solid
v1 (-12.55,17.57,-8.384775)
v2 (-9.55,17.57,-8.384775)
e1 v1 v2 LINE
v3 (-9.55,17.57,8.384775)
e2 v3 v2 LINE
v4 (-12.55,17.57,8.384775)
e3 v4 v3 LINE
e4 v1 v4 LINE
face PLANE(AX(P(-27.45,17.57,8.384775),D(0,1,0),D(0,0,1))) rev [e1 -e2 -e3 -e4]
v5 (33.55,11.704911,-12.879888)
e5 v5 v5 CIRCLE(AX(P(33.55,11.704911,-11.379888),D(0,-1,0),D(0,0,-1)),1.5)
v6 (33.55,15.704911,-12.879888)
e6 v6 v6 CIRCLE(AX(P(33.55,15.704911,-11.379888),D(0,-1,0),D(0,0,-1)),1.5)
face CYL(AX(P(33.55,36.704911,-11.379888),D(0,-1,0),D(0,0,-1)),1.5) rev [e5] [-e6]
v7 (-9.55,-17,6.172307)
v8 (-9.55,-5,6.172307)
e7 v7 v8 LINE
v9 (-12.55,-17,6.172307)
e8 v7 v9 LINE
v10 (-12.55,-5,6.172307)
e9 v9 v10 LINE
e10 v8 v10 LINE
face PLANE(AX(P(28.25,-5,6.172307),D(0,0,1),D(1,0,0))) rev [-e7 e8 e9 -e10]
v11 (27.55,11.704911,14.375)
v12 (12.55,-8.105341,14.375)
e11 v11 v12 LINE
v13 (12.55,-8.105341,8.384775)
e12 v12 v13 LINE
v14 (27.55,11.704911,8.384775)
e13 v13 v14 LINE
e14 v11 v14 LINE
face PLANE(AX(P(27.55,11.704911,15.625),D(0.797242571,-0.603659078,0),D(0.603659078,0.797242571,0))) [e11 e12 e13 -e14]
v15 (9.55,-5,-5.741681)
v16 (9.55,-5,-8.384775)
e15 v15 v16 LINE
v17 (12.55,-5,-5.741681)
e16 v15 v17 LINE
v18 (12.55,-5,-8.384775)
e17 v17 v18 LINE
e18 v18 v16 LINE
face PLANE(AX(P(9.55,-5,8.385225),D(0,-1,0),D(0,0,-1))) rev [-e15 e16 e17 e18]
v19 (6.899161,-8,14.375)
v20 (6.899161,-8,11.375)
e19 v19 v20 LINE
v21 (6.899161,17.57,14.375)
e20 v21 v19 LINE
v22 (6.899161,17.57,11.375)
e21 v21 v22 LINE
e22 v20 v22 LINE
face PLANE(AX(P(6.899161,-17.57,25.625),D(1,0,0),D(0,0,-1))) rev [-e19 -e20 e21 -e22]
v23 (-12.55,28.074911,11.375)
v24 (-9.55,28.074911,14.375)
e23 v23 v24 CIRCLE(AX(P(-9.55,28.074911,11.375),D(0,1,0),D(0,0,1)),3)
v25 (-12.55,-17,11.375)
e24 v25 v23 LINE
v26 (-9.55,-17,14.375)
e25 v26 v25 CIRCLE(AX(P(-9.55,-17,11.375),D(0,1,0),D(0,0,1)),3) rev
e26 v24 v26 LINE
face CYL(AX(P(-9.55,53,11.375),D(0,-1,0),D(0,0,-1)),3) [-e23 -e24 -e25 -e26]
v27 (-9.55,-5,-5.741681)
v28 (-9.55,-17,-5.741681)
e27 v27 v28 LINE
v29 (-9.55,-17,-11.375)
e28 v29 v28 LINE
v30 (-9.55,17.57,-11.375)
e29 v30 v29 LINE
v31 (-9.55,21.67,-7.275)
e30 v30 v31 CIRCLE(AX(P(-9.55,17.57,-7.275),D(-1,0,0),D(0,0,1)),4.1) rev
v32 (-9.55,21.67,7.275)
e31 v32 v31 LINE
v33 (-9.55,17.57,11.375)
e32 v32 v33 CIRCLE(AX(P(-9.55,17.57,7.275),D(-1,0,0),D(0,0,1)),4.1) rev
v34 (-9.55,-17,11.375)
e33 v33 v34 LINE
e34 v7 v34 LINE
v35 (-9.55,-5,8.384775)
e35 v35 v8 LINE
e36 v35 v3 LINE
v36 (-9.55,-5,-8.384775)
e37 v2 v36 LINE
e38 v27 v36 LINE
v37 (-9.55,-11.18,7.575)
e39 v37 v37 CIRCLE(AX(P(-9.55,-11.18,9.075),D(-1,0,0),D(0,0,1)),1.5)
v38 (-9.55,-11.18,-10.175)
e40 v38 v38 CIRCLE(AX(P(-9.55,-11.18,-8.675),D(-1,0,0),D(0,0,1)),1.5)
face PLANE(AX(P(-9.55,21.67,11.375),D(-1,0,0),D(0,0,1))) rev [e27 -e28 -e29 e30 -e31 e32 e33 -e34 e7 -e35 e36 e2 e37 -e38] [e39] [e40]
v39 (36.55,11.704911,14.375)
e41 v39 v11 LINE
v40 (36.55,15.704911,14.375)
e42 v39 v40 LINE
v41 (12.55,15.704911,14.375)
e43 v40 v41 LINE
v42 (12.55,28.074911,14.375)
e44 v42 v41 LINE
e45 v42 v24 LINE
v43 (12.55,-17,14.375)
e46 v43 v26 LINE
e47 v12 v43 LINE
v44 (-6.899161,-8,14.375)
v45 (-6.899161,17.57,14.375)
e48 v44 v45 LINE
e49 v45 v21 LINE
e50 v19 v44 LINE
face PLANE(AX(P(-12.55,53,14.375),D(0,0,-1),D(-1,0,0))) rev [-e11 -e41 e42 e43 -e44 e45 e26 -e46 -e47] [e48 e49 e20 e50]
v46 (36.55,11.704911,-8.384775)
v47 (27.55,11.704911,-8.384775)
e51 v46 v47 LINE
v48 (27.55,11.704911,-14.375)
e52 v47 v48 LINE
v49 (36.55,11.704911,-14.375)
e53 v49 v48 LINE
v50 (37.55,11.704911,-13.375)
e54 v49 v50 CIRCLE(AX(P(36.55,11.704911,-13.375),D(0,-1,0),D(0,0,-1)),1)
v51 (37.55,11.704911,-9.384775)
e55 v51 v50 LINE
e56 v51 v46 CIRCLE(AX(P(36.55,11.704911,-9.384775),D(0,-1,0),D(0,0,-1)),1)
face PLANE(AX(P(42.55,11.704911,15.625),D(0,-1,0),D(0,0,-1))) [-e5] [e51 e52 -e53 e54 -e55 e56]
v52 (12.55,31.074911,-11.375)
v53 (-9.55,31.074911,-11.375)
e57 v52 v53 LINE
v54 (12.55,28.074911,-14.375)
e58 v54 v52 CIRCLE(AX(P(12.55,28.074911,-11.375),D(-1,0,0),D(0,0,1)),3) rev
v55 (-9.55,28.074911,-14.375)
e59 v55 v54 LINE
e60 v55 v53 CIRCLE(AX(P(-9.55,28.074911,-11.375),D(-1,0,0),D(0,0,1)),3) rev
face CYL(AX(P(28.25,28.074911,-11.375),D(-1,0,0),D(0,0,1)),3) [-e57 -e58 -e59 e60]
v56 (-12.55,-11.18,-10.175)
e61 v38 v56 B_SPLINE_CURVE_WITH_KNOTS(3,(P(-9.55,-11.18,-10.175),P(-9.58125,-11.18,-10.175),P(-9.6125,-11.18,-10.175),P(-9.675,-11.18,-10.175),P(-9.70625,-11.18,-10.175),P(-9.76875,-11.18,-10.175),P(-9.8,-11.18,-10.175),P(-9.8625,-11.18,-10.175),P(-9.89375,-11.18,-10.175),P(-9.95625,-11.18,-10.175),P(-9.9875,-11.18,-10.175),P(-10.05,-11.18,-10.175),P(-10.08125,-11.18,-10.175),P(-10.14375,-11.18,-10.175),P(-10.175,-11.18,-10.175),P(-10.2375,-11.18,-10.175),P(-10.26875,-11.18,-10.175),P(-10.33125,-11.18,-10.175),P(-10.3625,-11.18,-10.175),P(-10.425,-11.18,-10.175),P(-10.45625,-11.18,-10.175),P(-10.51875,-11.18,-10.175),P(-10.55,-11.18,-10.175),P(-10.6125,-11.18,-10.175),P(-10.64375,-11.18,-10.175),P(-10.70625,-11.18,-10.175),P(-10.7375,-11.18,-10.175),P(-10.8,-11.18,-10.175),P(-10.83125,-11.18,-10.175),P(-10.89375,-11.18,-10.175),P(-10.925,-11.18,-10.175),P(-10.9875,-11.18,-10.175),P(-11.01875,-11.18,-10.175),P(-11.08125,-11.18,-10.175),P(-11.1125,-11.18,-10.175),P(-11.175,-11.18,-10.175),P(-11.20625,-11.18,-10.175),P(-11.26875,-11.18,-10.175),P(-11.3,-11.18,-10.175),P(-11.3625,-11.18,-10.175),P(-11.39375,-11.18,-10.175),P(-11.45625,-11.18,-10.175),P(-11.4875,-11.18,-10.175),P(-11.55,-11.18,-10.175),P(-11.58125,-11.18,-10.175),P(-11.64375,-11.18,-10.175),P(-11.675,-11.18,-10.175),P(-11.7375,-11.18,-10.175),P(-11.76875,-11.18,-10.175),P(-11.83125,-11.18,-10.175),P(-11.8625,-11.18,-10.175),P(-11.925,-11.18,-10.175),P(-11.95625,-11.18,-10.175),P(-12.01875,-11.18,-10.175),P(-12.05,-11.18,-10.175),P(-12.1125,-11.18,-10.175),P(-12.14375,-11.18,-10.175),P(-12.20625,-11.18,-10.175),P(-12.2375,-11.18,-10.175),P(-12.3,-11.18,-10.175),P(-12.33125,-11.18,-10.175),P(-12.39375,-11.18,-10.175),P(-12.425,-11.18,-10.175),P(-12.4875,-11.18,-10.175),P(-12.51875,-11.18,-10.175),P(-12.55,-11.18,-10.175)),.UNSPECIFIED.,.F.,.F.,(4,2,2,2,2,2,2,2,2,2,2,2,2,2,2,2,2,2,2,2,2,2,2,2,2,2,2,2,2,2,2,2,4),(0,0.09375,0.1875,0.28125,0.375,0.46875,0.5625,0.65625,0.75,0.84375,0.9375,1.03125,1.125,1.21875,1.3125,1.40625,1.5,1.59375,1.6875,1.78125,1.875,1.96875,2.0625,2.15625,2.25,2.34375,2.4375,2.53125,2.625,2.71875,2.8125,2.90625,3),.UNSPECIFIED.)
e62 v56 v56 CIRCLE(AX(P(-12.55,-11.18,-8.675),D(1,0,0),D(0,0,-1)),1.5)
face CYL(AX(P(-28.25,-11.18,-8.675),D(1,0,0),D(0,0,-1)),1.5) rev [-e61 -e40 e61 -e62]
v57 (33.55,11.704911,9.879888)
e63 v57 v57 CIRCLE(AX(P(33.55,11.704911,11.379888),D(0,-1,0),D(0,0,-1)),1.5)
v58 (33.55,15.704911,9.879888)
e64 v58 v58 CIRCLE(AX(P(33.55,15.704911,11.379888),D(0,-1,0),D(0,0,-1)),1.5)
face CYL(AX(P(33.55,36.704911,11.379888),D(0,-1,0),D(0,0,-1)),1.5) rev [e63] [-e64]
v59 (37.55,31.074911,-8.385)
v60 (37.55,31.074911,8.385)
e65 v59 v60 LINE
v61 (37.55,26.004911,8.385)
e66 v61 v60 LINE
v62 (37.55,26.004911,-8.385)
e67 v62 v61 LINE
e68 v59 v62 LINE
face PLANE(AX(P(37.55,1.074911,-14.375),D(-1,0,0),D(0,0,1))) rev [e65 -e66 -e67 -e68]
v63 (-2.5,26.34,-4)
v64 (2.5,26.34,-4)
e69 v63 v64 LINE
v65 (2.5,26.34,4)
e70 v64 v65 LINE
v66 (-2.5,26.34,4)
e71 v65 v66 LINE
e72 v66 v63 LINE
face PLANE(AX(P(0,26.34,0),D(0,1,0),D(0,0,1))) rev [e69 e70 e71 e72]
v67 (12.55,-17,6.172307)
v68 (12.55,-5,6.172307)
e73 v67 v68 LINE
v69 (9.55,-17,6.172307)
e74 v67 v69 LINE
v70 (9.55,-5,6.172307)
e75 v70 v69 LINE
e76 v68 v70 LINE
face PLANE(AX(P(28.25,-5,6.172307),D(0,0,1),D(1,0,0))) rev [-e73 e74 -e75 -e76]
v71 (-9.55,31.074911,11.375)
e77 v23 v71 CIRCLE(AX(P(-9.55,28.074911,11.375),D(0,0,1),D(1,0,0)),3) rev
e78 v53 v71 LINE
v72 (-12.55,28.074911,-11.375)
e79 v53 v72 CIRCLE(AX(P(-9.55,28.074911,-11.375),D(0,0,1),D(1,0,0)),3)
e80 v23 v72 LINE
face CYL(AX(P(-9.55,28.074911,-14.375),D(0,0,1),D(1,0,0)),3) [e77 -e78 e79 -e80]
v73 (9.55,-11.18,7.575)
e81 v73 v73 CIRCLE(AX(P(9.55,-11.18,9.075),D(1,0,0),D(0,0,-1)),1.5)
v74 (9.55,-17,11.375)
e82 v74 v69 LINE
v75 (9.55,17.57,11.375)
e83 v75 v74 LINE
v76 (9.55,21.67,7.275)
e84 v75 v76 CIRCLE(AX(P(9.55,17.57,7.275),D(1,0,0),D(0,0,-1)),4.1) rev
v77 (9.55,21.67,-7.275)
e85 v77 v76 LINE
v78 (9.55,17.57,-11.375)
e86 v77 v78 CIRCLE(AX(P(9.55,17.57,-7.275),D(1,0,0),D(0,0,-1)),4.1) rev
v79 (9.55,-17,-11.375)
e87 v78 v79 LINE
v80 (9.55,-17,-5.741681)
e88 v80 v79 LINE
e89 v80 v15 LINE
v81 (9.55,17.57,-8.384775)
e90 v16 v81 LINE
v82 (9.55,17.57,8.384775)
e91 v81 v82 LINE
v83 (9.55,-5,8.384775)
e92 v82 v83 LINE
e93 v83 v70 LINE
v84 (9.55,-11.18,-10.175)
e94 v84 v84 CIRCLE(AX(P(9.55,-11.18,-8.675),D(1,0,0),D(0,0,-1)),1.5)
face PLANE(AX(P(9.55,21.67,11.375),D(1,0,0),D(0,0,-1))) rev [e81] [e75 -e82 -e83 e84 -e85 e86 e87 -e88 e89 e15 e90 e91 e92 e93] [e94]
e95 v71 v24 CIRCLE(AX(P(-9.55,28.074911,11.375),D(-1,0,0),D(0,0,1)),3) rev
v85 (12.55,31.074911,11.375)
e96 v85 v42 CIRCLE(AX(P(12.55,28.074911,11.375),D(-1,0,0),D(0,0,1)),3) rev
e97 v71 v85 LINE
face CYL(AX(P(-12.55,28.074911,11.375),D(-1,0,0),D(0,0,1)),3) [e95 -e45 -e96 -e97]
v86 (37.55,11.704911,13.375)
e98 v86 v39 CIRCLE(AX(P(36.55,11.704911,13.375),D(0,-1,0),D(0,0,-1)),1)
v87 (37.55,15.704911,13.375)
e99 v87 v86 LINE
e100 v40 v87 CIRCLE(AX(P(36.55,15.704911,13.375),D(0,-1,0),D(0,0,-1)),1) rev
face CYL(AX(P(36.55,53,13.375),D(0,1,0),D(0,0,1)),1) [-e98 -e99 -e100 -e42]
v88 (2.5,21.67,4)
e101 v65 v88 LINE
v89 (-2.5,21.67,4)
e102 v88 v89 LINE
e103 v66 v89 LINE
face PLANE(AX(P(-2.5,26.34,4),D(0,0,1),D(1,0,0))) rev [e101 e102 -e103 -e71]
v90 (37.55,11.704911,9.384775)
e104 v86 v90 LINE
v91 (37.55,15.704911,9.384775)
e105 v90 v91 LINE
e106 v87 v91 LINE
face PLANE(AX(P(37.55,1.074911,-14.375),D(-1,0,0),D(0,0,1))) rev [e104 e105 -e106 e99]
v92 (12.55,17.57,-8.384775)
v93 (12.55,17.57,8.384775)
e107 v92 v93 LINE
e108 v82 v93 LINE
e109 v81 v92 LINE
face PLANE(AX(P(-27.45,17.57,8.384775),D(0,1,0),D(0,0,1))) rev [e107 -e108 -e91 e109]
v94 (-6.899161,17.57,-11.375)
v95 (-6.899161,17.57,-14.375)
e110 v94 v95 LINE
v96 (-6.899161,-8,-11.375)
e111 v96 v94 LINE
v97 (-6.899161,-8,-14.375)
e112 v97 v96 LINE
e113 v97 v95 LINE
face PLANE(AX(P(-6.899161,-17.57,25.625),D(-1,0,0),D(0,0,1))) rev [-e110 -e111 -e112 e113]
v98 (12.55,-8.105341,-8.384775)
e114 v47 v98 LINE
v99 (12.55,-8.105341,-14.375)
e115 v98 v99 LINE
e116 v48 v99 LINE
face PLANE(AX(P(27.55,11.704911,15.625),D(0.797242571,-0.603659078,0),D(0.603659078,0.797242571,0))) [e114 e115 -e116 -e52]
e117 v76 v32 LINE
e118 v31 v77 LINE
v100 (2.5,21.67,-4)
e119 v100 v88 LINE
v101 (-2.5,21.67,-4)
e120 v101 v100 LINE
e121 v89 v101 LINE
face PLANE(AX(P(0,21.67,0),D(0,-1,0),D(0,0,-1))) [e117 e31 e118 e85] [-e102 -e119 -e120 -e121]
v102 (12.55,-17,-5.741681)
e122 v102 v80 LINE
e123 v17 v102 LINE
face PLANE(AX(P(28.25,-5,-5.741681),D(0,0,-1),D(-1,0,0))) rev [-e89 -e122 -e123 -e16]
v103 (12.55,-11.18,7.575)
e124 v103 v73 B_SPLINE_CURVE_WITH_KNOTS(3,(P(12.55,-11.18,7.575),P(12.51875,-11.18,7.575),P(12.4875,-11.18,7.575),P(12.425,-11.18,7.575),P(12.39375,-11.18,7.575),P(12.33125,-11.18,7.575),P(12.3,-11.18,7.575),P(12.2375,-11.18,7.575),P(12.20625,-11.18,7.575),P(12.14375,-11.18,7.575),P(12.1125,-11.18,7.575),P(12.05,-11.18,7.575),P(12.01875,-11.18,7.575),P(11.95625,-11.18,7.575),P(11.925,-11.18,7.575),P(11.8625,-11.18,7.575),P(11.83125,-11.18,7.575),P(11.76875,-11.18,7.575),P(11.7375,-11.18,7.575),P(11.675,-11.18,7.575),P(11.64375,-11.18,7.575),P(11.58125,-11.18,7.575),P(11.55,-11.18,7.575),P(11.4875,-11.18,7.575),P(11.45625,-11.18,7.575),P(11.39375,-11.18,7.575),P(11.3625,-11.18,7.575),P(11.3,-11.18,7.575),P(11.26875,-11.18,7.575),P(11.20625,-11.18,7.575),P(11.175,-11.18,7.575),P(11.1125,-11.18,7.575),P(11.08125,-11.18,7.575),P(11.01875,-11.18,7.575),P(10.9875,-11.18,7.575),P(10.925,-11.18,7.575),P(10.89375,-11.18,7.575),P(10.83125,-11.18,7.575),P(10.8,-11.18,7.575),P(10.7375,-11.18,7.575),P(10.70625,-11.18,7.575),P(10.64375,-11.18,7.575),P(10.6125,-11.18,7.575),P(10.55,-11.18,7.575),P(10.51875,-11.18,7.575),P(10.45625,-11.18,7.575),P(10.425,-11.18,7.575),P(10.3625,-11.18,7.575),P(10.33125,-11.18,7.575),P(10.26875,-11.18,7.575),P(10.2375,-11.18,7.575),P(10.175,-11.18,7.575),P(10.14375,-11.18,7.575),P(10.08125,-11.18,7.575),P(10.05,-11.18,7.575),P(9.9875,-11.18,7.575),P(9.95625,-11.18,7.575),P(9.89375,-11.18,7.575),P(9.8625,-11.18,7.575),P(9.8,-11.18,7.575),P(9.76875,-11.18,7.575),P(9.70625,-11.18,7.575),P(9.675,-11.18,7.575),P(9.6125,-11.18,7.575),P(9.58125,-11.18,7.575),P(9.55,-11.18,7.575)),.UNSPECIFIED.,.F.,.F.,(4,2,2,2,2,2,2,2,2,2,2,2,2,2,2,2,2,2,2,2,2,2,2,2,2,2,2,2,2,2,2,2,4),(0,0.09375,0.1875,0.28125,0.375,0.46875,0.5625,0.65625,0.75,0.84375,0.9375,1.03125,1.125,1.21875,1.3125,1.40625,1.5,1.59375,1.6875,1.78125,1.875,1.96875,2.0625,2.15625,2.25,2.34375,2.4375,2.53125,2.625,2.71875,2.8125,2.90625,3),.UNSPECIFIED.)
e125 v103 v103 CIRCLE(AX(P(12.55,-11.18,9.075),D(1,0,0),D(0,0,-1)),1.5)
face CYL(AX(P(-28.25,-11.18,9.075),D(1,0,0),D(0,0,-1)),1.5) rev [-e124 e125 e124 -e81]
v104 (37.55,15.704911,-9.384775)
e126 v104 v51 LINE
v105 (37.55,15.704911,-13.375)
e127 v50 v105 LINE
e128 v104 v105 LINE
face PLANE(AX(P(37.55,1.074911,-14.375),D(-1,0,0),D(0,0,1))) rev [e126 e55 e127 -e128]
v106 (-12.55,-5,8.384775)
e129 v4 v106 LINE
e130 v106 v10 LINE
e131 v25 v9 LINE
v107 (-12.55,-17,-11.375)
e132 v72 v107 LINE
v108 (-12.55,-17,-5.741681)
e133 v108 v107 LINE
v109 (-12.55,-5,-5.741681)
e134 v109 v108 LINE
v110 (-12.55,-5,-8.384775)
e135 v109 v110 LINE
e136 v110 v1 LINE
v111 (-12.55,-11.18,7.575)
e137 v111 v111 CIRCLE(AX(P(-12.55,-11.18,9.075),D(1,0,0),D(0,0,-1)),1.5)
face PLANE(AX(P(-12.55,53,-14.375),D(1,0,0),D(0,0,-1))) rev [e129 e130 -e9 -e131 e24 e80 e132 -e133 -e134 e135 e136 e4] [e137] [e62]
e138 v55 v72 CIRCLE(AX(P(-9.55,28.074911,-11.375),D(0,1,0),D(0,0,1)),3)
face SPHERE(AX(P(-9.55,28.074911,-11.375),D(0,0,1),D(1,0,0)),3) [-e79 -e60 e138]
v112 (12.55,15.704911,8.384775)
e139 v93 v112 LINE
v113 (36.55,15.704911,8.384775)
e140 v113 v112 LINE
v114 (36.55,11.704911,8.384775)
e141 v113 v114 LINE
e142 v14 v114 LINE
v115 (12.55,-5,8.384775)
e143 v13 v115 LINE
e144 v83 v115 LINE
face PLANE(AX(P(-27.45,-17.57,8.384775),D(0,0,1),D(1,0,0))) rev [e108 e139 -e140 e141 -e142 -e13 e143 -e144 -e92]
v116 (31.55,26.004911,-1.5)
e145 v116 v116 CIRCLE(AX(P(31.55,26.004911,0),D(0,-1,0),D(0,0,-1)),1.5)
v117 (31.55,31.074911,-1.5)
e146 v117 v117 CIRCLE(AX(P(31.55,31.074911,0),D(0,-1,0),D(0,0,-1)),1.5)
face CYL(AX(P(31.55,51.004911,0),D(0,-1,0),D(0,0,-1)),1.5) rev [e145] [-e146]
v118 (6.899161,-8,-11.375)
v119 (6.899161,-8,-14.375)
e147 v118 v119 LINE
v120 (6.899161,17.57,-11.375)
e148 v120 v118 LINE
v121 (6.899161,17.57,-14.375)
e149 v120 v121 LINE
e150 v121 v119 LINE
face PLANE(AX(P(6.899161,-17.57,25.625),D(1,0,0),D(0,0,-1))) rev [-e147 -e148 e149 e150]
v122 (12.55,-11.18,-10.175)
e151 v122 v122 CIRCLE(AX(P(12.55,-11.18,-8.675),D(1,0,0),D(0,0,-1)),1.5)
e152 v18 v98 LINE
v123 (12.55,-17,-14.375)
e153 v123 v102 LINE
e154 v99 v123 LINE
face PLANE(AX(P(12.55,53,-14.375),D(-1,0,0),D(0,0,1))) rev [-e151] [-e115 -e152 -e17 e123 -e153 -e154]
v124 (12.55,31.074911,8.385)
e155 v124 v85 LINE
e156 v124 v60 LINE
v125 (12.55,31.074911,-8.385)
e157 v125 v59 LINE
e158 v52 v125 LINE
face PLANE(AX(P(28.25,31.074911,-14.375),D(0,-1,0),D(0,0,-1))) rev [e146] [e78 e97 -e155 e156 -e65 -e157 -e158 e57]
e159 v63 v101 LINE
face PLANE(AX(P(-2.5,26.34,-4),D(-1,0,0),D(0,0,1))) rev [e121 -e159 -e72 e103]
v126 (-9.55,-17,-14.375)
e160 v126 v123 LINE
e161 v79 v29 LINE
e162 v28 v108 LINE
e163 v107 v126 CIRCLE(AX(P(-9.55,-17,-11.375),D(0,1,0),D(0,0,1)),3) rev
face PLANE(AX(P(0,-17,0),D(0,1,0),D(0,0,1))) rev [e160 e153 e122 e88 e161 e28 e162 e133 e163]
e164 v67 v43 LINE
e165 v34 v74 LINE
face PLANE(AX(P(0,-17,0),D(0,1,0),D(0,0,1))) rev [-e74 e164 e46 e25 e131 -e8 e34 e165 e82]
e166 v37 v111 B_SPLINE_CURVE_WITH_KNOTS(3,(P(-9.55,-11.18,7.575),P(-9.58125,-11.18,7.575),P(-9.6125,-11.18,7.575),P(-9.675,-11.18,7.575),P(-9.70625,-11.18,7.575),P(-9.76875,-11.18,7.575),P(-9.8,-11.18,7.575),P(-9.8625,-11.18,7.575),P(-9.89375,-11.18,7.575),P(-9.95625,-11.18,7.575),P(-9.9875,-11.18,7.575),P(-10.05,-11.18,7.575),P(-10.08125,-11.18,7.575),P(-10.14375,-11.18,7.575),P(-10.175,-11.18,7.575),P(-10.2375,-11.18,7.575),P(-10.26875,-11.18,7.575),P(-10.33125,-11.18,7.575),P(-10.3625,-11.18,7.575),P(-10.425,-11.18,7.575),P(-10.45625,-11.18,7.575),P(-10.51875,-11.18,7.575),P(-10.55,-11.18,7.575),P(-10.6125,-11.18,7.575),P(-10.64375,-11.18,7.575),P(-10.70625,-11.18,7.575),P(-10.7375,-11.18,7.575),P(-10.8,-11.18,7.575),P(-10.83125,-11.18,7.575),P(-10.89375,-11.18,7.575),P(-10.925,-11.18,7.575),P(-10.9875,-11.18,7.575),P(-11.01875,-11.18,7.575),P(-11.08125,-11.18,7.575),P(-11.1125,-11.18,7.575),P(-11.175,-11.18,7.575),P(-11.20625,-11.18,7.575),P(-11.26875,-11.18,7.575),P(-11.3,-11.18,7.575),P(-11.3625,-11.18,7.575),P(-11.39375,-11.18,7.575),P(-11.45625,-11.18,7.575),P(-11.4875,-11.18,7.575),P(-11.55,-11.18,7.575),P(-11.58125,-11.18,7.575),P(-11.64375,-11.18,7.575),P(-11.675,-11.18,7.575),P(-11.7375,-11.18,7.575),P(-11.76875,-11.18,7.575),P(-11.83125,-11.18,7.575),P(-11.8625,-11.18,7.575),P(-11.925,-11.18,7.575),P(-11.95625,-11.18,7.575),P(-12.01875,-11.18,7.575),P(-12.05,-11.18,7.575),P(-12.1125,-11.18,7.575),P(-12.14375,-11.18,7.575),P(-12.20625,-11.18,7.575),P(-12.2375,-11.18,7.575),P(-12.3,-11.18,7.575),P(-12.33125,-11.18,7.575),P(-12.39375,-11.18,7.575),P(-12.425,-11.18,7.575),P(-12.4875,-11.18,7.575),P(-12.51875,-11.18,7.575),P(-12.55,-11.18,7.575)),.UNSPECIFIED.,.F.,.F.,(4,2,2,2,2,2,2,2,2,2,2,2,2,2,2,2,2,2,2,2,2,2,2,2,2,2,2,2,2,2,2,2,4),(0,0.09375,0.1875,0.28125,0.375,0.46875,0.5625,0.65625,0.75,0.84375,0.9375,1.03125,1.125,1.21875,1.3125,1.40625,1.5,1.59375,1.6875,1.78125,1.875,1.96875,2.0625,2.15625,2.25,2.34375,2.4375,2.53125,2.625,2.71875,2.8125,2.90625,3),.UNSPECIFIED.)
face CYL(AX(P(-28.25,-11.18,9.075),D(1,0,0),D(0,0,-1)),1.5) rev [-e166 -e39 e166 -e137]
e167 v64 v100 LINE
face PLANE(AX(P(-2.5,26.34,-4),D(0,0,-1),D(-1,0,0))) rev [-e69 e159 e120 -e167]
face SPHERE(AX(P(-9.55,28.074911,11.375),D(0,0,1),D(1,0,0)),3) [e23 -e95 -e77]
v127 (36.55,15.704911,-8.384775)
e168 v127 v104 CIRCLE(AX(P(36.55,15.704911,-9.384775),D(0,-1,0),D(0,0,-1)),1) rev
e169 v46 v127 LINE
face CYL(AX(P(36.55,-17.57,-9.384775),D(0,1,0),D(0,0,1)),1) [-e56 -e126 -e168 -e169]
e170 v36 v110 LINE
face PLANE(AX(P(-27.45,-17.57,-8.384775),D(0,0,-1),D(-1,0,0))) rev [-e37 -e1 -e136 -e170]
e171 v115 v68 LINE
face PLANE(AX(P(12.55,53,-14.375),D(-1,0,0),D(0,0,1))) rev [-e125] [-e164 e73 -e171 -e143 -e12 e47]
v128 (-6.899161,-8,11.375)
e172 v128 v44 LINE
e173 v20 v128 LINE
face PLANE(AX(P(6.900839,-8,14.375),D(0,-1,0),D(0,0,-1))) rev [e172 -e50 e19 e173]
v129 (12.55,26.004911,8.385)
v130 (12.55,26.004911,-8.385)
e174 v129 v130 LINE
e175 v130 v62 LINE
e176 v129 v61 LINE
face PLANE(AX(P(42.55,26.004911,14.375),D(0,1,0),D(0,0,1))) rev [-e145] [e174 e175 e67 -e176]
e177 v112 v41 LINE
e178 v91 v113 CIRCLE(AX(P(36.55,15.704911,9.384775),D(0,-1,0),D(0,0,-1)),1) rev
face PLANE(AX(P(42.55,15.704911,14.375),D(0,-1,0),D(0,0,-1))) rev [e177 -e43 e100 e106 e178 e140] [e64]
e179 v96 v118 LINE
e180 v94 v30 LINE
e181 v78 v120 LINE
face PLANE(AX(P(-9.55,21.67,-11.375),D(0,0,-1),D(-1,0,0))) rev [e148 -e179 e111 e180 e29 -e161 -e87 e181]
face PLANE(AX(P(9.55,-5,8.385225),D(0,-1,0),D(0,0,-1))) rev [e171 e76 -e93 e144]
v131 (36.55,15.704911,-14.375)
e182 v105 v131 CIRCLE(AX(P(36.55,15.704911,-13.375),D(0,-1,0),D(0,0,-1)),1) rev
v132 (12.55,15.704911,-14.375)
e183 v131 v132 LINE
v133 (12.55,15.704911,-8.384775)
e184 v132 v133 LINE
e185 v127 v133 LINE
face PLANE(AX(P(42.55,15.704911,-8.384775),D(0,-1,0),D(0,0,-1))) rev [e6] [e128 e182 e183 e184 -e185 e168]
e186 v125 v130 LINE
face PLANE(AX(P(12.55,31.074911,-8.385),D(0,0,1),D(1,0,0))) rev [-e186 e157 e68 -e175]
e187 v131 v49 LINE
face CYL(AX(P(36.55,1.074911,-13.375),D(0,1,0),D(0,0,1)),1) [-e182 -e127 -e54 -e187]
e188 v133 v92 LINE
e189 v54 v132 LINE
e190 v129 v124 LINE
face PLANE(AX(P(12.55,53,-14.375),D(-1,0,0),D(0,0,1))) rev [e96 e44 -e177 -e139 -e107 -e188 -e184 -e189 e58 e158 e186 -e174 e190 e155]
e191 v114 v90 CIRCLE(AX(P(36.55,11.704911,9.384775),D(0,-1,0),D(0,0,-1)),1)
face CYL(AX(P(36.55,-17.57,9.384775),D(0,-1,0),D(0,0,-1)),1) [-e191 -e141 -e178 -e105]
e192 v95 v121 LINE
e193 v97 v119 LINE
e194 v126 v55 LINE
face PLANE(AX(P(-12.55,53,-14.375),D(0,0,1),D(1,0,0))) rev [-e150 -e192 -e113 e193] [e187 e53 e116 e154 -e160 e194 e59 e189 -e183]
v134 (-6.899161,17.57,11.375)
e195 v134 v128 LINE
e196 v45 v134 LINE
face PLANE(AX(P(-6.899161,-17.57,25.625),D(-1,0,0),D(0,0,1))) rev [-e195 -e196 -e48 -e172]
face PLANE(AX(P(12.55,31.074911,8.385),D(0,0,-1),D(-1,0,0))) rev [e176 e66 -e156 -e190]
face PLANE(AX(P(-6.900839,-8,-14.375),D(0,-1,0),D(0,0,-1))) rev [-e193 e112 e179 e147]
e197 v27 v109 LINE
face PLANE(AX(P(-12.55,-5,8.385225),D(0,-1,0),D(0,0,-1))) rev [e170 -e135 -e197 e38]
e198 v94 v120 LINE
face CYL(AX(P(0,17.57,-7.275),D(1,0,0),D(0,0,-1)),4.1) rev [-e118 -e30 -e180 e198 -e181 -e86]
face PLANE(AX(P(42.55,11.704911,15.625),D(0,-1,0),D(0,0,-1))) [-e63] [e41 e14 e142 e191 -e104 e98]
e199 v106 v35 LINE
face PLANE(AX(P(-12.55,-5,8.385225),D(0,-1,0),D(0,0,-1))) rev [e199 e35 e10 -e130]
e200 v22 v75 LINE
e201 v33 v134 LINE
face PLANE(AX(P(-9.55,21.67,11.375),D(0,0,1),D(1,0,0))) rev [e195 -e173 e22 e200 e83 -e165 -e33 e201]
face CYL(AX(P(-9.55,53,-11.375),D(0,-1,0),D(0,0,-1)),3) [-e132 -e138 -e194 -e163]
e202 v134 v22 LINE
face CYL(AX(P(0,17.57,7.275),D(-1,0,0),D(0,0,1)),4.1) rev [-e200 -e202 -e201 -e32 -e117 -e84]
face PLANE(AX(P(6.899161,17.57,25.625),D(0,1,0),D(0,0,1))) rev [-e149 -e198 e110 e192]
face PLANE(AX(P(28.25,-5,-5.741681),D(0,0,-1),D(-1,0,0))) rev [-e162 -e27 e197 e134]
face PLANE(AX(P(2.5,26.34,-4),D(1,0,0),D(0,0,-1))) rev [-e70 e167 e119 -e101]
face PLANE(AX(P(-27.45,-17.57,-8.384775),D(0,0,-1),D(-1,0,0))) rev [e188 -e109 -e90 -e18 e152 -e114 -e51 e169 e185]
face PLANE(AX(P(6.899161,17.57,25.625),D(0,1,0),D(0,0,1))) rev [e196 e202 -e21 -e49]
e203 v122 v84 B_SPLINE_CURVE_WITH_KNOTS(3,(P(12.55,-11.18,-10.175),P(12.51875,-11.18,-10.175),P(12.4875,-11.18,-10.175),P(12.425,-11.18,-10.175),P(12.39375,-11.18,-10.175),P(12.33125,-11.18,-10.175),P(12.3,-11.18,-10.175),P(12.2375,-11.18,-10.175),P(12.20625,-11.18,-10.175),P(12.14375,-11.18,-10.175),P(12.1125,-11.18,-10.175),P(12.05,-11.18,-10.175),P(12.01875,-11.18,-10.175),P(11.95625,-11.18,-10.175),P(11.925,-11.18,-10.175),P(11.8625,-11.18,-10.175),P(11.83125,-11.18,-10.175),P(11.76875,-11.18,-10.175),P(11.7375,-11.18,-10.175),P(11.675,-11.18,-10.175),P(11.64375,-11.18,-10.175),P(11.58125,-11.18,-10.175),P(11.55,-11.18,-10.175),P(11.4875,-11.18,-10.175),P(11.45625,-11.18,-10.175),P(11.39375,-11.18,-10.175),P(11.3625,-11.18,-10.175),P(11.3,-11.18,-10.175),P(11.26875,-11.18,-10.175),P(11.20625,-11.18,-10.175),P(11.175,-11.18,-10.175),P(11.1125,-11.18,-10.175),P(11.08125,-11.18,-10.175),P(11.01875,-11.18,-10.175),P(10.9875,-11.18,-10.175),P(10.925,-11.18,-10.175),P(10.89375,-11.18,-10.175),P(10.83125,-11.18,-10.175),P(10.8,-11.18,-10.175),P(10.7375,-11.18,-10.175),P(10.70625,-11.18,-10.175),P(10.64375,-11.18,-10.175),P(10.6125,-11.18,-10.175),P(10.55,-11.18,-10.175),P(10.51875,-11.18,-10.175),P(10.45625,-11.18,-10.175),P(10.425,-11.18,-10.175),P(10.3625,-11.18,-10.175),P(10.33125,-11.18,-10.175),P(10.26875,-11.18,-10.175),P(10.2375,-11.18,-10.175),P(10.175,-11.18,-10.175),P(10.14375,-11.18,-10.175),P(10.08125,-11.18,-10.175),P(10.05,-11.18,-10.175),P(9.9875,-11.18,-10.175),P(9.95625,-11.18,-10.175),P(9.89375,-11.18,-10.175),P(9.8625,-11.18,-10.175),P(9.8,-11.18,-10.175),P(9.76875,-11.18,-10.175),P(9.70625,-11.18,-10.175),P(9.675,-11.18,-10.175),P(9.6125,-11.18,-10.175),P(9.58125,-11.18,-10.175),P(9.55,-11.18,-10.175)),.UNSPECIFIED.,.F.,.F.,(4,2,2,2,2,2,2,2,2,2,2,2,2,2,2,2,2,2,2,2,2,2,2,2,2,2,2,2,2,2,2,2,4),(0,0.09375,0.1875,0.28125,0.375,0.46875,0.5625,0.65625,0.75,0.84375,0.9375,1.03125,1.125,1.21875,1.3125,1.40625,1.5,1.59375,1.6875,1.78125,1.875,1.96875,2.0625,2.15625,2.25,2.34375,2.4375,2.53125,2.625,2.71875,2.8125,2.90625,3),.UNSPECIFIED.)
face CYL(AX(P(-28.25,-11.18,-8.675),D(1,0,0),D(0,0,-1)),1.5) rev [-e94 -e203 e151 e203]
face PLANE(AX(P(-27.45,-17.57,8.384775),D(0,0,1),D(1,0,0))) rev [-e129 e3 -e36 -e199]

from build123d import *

# Parameters (mm, degrees)
SKETCH4_W            = 25.1
SKETCH4_H            = 28.75
BOSS_EXTRUDE2_DEPTH  = 53
SKETCH5_W            = 19.1
SKETCH5_H            = 22.75
CUT_EXTRUDE1_DEPTH   = 21.67
FILLET1_R            = 4.1
SKETCH6_W            = 5
SKETCH6_H            = 8
CUT_EXTRUDE2_DEPTH   = 4.67
SKETCH7_W            = 16.769550268
SKETCH7_H            = 35.14
CUT_EXTRUDE3_DEPTH   = 40
SKETCH8_W            = 13.798322684
SKETCH8_H            = 35.14
CUT_EXTRUDE4_DEPTH   = 40
BOSS_EXTRUDE3_DEPTH  = 17
SKETCH10_W           = 3
SKETCH10_H           = 9
BOSS_EXTRUDE4_DEPTH  = 13.8
SKETCH11_W           = 3
SKETCH11_H           = 9
BOSS_EXTRUDE5_DEPTH  = 13.8
SKETCH12_W           = 3
SKETCH12_H           = 12
BOSS_EXTRUDE6_DEPTH  = 16.77
SKETCH24_R           = 1.5
CUT_EXTRUDE6_DEPTH   = 40.8
SKETCH25_W           = 28.75
SKETCH25_H           = 21.925089144
CUT_EXTRUDE7_DEPTH   = 40.8
SKETCH26_W           = 11.913987102
SKETCH26_H           = 12
CUT_EXTRUDE8_DEPTH   = 40.8
SKETCH30_W           = 28.75
SKETCH30_H           = 5.07
BOSS_EXTRUDE10_DEPTH = 30
SKETCH32_W           = 5.990224866
SKETCH32_H           = 23.810252184
BOSS_EXTRUDE13_DEPTH = 30
CUT_EXTRUDE9_DEPTH   = 30
SKETCH36_W           = 5
SKETCH36_H           = 28.75
CUT_EXTRUDE10_DEPTH  = 30
SKETCH38_W           = 5.99
SKETCH38_H           = 5.07
CUT_EXTRUDE11_DEPTH  = 25
SKETCH39_R           = 1.5
CUT_EXTRUDE12_DEPTH  = 25
SKETCH40_R           = 1.5
CUT_EXTRUDE13_DEPTH  = 25
FILLET4_R            = 3
FILLET5_R            = 3
FILLET7_R            = 1


with BuildPart() as part:
    # Sketch4 → Boss-Extrude2 (new body)
    with BuildSketch(Plane(origin=(0, 0, 0), x_dir=(1, 0, 0), z_dir=(0, 1, 0))):
        Rectangle(SKETCH4_W, SKETCH4_H)
    extrude(amount=BOSS_EXTRUDE2_DEPTH)

    # Sketch5 → Cut-Extrude1 (cut)
    with BuildSketch(Plane(origin=(0, 0, 0), x_dir=(-1, 0, 0), z_dir=(0, -1, 0))):
        Rectangle(SKETCH5_W, SKETCH5_H)
    extrude(amount=-CUT_EXTRUDE1_DEPTH, mode=Mode.SUBTRACT)

    # Fillet1
    fillet1_edges = [part.edges().sort_by_distance(p)[0] for p in [
        (0, 21.67, -11.375),
        (0, 21.67, 11.375),
    ]]
    fillet(fillet1_edges, radius=FILLET1_R)

    # Sketch6 → Cut-Extrude2 (cut)
    with BuildSketch(Plane(origin=(0, 21.67, 0), x_dir=(-1, 0, 0), z_dir=(0, -1, 0))):
        Rectangle(SKETCH6_W, SKETCH6_H)
    extrude(amount=-CUT_EXTRUDE2_DEPTH, mode=Mode.SUBTRACT)

    # Sketch7 → Cut-Extrude3 (cut)
    with BuildSketch(Plane(origin=(12.55, 0, 0), x_dir=(0, 0, -1), z_dir=(1, 0, 0))):
        Rectangle(SKETCH7_W, SKETCH7_H)
    extrude(amount=-CUT_EXTRUDE3_DEPTH, mode=Mode.SUBTRACT)

    # Sketch8 → Cut-Extrude4 (cut)
    with BuildSketch(Plane(origin=(0, 0, -14.375), x_dir=(-1, 0, 0), z_dir=(0, 0, -1))):
        Rectangle(SKETCH8_W, SKETCH8_H)
    extrude(amount=-CUT_EXTRUDE4_DEPTH, mode=Mode.SUBTRACT)

    # Sketch9 → Boss-Extrude3 (add)
    with BuildSketch(Plane.XZ):
        Polygon((-9.55, 8.384775134), (-12.55, 8.384775134), (-12.55, 14.375), (-6.899161342, 14.375), (-6.899161342, 11.375), (-9.55, 11.375), align=None)
        Polygon((-9.55, -8.384775134), (-12.55, -8.384775134), (-12.55, -14.375), (-6.899161342, -14.375), (-6.899161342, -11.375), (-9.55, -11.375), align=None)
        Polygon((6.899161342, -11.375), (6.899161342, -14.375), (12.55, -14.375), (12.55, -8.384775134), (9.55, -8.384775134), (9.55, -11.375), align=None)
        Polygon((9.55, 8.384775134), (12.55, 8.384775134), (12.55, 14.375), (6.899161342, 14.375), (6.899161342, 11.375), (9.55, 11.375), align=None)
    extrude(amount=BOSS_EXTRUDE3_DEPTH)

    # Sketch10 → Boss-Extrude4 (add)
    with BuildSketch(Plane(origin=(-6.899161342, 0, 0), x_dir=(0, 0, -1), z_dir=(1, 0, 0))):
        with Locations((-12.875, -12.5)):
            Rectangle(SKETCH10_W, SKETCH10_H)
    extrude(amount=BOSS_EXTRUDE4_DEPTH)

    # Sketch11 → Boss-Extrude5 (add)
    with BuildSketch(Plane.ZY.offset(-6.899161342)):
        with Locations((-12.875, -12.5)):
            Rectangle(SKETCH11_W, SKETCH11_H)
    extrude(amount=BOSS_EXTRUDE5_DEPTH)

    # Sketch12 → Boss-Extrude6 (add)
    with BuildSketch(Plane.XY.offset(-8.384775134)):
        with Locations((-11.05, -11)):
            Rectangle(SKETCH12_W, SKETCH12_H)
        with Locations((11.05, -11)):
            Rectangle(SKETCH12_W, SKETCH12_H)
    extrude(amount=BOSS_EXTRUDE6_DEPTH)

    # Sketch24 → Cut-Extrude6 (cut)
    with BuildSketch(Plane(origin=(12.55, 0, 0), x_dir=(0, 0, -1), z_dir=(1, 0, 0))):
        with Locations((8.675, -11.18)):
            Circle(SKETCH24_R)
        with Locations((-9.075, -11.18)):
            Circle(SKETCH24_R)
    extrude(amount=-CUT_EXTRUDE6_DEPTH, mode=Mode.SUBTRACT)

    # Sketch25 → Cut-Extrude7 (cut)
    with BuildSketch(Plane.ZY.offset(12.55)):
        with Locations((0, 42.037455428)):
            Rectangle(SKETCH25_W, SKETCH25_H)
    extrude(amount=-CUT_EXTRUDE7_DEPTH, mode=Mode.SUBTRACT)

    # Sketch26 → Cut-Extrude8 (cut)
    with BuildSketch(Plane.ZY.offset(12.55)):
        with Locations((0.21531302, -11)):
            Rectangle(SKETCH26_W, SKETCH26_H)
    extrude(amount=-CUT_EXTRUDE8_DEPTH, mode=Mode.SUBTRACT)

    # Sketch30 → Boss-Extrude10 (add)
    with BuildSketch(Plane(origin=(12.55, 0, 0), x_dir=(0, 0, -1), z_dir=(1, 0, 0))):
        with Locations((0, 28.539910856)):
            Rectangle(SKETCH30_W, SKETCH30_H)
    extrude(amount=BOSS_EXTRUDE10_DEPTH)

    # Sketch32 → Boss-Extrude13 (add)
    with BuildSketch(Plane(origin=(12.55, 0, 0), x_dir=(0, 0, -1), z_dir=(1, 0, 0))):
        with Locations((-11.379887567, 3.799784764)):
            Rectangle(SKETCH32_W, SKETCH32_H)
        with Locations((11.379887567, 3.799784764)):
            Rectangle(SKETCH32_W, SKETCH32_H)
    extrude(amount=BOSS_EXTRUDE13_DEPTH)

    # Sketch35 → Cut-Extrude9 (cut)
    with BuildSketch(Plane(origin=(0, 0, -14.375), x_dir=(-1, 0, 0), z_dir=(0, 0, -1))):
        Polygon((-42.55, 11.704910856), (-27.55, 11.704910856), (-12.55, -8.105341328), (-42.55, -8.105341328), align=None)
    extrude(amount=-CUT_EXTRUDE9_DEPTH, mode=Mode.SUBTRACT)

    # Sketch36 → Cut-Extrude10 (cut)
    with BuildSketch(Plane(origin=(0, 31.074910856, 0), x_dir=(1, 0, 0), z_dir=(0, 1, 0))):
        with Locations((40.05, 0)):
            Rectangle(SKETCH36_W, SKETCH36_H)
    extrude(amount=-CUT_EXTRUDE10_DEPTH, mode=Mode.SUBTRACT)

    # Sketch38 → Cut-Extrude11 (cut)
    with BuildSketch(Plane(origin=(37.55, 0, 0), x_dir=(0, 0, -1), z_dir=(1, 0, 0))):
        with Locations((-11.38, 28.539910856)):
            Rectangle(SKETCH38_W, SKETCH38_H)
        with Locations((11.38, 28.539910856)):
            Rectangle(SKETCH38_W, SKETCH38_H)
    extrude(amount=-CUT_EXTRUDE11_DEPTH, mode=Mode.SUBTRACT)

    # Sketch39 → Cut-Extrude12 (cut)
    with BuildSketch(Plane(origin=(0, 11.704910856, 0), x_dir=(-1, 0, 0), z_dir=(0, -1, 0))):
        with Locations(Location((-33.55, 11.379887567, 0), (0, 0, 90))):
            Circle(SKETCH39_R)
        with Locations(Location((-33.55, -11.379887567, 0), (0, 0, 90))):
            Circle(SKETCH39_R)
    extrude(amount=-CUT_EXTRUDE12_DEPTH, mode=Mode.SUBTRACT)

    # Sketch40 → Cut-Extrude13 (cut)
    with BuildSketch(Plane.XZ.offset(-26.004910856)):
        with Locations(Location((31.55, 0, 0), (0, 0, 270))):
            Circle(SKETCH40_R)
    extrude(amount=-CUT_EXTRUDE13_DEPTH, mode=Mode.SUBTRACT)

    # Fillet4
    fillet4_edges = [part.edges().sort_by_distance(p)[0] for p in [
        (-12.55, 31.074910856, 0),
        (0, 31.074910856, 14.375),
        (0, 31.074910856, -14.375),
    ]]
    fillet(fillet4_edges, radius=FILLET4_R)

    # Fillet5
    # the kernel refuses this fillet: 3 mm, written as the material it takes off along each edge
    with BuildSketch(Plane(origin=(-9.55, 28.074910856, 11.375), x_dir=(0, 0, 1), z_dir=(-1, 0, 0))) as fillet5_piece_1_section:
        Polygon((0, 0), (FILLET5_R, 0), (FILLET5_R, FILLET5_R), (0, FILLET5_R), align=None)
    fillet5_piece_1 = extrude(amount=FILLET5_R, mode=Mode.PRIVATE)
    fillet5_piece_1 = fillet5_piece_1 - Plane(origin=(-9.55, 28.074910856, 11.375), x_dir=(0, -0.7071067811865475, -0.7071067811865475), z_dir=(-1, 0, 0)) * Sphere(FILLET5_R, mode=Mode.PRIVATE)
    add(fillet5_piece_1, mode=Mode.SUBTRACT)
    with BuildSketch(Plane(origin=(-9.55, 28.074910856, -11.375), x_dir=(-1, 0, 0), z_dir=(0, 0, -1))) as fillet5_piece_2_section:
        Polygon((0, 0), (FILLET5_R, 0), (FILLET5_R, FILLET5_R), (0, FILLET5_R), align=None)
    fillet5_piece_2 = extrude(amount=FILLET5_R, mode=Mode.PRIVATE)
    fillet5_piece_2 = fillet5_piece_2 - Plane(origin=(-9.55, 28.074910856, -11.375), x_dir=(0.7071067811865475, -0.7071067811865475, 0), z_dir=(0, 0, -1)) * Sphere(FILLET5_R, mode=Mode.PRIVATE)
    add(fillet5_piece_2, mode=Mode.SUBTRACT)
    with BuildSketch(Plane(origin=(-12.55, 28.074910856, -14.375), x_dir=(1, 0, 0), z_dir=(0, -1, 0))) as fillet5_piece_3:
        with BuildLine():
            CenterArc((FILLET5_R, FILLET5_R), FILLET5_R, 180, 90)
            Line((0, FILLET5_R), (0, 0))
            Line((0, 0), (FILLET5_R, 0))
        make_face()
    extrude(amount=52.574910856, mode=Mode.SUBTRACT)
    with BuildSketch(Plane(origin=(-12.55, -24.5, 14.375), x_dir=(0, 0, -1), z_dir=(0, 1, 0))) as fillet5_piece_4:
        with BuildLine():
            CenterArc((FILLET5_R, -FILLET5_R), FILLET5_R, 90, 90)
            Line((0, -FILLET5_R), (0, 0))
            Line((0, 0), (FILLET5_R, 0))
        make_face()
    extrude(amount=52.574910856, mode=Mode.SUBTRACT)

    # Fillet7
    fillet7_edges = [part.edges().sort_by_distance(p)[0] for p in [
        (37.55, 13.704910856, -14.375),
        (37.55, 13.704910856, -8.384775134),
        (37.55, 13.704910856, 14.375),
        (37.55, 13.704910856, 8.384775134),
    ]]
    fillet(fillet7_edges, radius=FILLET7_R)


solid = part.part
